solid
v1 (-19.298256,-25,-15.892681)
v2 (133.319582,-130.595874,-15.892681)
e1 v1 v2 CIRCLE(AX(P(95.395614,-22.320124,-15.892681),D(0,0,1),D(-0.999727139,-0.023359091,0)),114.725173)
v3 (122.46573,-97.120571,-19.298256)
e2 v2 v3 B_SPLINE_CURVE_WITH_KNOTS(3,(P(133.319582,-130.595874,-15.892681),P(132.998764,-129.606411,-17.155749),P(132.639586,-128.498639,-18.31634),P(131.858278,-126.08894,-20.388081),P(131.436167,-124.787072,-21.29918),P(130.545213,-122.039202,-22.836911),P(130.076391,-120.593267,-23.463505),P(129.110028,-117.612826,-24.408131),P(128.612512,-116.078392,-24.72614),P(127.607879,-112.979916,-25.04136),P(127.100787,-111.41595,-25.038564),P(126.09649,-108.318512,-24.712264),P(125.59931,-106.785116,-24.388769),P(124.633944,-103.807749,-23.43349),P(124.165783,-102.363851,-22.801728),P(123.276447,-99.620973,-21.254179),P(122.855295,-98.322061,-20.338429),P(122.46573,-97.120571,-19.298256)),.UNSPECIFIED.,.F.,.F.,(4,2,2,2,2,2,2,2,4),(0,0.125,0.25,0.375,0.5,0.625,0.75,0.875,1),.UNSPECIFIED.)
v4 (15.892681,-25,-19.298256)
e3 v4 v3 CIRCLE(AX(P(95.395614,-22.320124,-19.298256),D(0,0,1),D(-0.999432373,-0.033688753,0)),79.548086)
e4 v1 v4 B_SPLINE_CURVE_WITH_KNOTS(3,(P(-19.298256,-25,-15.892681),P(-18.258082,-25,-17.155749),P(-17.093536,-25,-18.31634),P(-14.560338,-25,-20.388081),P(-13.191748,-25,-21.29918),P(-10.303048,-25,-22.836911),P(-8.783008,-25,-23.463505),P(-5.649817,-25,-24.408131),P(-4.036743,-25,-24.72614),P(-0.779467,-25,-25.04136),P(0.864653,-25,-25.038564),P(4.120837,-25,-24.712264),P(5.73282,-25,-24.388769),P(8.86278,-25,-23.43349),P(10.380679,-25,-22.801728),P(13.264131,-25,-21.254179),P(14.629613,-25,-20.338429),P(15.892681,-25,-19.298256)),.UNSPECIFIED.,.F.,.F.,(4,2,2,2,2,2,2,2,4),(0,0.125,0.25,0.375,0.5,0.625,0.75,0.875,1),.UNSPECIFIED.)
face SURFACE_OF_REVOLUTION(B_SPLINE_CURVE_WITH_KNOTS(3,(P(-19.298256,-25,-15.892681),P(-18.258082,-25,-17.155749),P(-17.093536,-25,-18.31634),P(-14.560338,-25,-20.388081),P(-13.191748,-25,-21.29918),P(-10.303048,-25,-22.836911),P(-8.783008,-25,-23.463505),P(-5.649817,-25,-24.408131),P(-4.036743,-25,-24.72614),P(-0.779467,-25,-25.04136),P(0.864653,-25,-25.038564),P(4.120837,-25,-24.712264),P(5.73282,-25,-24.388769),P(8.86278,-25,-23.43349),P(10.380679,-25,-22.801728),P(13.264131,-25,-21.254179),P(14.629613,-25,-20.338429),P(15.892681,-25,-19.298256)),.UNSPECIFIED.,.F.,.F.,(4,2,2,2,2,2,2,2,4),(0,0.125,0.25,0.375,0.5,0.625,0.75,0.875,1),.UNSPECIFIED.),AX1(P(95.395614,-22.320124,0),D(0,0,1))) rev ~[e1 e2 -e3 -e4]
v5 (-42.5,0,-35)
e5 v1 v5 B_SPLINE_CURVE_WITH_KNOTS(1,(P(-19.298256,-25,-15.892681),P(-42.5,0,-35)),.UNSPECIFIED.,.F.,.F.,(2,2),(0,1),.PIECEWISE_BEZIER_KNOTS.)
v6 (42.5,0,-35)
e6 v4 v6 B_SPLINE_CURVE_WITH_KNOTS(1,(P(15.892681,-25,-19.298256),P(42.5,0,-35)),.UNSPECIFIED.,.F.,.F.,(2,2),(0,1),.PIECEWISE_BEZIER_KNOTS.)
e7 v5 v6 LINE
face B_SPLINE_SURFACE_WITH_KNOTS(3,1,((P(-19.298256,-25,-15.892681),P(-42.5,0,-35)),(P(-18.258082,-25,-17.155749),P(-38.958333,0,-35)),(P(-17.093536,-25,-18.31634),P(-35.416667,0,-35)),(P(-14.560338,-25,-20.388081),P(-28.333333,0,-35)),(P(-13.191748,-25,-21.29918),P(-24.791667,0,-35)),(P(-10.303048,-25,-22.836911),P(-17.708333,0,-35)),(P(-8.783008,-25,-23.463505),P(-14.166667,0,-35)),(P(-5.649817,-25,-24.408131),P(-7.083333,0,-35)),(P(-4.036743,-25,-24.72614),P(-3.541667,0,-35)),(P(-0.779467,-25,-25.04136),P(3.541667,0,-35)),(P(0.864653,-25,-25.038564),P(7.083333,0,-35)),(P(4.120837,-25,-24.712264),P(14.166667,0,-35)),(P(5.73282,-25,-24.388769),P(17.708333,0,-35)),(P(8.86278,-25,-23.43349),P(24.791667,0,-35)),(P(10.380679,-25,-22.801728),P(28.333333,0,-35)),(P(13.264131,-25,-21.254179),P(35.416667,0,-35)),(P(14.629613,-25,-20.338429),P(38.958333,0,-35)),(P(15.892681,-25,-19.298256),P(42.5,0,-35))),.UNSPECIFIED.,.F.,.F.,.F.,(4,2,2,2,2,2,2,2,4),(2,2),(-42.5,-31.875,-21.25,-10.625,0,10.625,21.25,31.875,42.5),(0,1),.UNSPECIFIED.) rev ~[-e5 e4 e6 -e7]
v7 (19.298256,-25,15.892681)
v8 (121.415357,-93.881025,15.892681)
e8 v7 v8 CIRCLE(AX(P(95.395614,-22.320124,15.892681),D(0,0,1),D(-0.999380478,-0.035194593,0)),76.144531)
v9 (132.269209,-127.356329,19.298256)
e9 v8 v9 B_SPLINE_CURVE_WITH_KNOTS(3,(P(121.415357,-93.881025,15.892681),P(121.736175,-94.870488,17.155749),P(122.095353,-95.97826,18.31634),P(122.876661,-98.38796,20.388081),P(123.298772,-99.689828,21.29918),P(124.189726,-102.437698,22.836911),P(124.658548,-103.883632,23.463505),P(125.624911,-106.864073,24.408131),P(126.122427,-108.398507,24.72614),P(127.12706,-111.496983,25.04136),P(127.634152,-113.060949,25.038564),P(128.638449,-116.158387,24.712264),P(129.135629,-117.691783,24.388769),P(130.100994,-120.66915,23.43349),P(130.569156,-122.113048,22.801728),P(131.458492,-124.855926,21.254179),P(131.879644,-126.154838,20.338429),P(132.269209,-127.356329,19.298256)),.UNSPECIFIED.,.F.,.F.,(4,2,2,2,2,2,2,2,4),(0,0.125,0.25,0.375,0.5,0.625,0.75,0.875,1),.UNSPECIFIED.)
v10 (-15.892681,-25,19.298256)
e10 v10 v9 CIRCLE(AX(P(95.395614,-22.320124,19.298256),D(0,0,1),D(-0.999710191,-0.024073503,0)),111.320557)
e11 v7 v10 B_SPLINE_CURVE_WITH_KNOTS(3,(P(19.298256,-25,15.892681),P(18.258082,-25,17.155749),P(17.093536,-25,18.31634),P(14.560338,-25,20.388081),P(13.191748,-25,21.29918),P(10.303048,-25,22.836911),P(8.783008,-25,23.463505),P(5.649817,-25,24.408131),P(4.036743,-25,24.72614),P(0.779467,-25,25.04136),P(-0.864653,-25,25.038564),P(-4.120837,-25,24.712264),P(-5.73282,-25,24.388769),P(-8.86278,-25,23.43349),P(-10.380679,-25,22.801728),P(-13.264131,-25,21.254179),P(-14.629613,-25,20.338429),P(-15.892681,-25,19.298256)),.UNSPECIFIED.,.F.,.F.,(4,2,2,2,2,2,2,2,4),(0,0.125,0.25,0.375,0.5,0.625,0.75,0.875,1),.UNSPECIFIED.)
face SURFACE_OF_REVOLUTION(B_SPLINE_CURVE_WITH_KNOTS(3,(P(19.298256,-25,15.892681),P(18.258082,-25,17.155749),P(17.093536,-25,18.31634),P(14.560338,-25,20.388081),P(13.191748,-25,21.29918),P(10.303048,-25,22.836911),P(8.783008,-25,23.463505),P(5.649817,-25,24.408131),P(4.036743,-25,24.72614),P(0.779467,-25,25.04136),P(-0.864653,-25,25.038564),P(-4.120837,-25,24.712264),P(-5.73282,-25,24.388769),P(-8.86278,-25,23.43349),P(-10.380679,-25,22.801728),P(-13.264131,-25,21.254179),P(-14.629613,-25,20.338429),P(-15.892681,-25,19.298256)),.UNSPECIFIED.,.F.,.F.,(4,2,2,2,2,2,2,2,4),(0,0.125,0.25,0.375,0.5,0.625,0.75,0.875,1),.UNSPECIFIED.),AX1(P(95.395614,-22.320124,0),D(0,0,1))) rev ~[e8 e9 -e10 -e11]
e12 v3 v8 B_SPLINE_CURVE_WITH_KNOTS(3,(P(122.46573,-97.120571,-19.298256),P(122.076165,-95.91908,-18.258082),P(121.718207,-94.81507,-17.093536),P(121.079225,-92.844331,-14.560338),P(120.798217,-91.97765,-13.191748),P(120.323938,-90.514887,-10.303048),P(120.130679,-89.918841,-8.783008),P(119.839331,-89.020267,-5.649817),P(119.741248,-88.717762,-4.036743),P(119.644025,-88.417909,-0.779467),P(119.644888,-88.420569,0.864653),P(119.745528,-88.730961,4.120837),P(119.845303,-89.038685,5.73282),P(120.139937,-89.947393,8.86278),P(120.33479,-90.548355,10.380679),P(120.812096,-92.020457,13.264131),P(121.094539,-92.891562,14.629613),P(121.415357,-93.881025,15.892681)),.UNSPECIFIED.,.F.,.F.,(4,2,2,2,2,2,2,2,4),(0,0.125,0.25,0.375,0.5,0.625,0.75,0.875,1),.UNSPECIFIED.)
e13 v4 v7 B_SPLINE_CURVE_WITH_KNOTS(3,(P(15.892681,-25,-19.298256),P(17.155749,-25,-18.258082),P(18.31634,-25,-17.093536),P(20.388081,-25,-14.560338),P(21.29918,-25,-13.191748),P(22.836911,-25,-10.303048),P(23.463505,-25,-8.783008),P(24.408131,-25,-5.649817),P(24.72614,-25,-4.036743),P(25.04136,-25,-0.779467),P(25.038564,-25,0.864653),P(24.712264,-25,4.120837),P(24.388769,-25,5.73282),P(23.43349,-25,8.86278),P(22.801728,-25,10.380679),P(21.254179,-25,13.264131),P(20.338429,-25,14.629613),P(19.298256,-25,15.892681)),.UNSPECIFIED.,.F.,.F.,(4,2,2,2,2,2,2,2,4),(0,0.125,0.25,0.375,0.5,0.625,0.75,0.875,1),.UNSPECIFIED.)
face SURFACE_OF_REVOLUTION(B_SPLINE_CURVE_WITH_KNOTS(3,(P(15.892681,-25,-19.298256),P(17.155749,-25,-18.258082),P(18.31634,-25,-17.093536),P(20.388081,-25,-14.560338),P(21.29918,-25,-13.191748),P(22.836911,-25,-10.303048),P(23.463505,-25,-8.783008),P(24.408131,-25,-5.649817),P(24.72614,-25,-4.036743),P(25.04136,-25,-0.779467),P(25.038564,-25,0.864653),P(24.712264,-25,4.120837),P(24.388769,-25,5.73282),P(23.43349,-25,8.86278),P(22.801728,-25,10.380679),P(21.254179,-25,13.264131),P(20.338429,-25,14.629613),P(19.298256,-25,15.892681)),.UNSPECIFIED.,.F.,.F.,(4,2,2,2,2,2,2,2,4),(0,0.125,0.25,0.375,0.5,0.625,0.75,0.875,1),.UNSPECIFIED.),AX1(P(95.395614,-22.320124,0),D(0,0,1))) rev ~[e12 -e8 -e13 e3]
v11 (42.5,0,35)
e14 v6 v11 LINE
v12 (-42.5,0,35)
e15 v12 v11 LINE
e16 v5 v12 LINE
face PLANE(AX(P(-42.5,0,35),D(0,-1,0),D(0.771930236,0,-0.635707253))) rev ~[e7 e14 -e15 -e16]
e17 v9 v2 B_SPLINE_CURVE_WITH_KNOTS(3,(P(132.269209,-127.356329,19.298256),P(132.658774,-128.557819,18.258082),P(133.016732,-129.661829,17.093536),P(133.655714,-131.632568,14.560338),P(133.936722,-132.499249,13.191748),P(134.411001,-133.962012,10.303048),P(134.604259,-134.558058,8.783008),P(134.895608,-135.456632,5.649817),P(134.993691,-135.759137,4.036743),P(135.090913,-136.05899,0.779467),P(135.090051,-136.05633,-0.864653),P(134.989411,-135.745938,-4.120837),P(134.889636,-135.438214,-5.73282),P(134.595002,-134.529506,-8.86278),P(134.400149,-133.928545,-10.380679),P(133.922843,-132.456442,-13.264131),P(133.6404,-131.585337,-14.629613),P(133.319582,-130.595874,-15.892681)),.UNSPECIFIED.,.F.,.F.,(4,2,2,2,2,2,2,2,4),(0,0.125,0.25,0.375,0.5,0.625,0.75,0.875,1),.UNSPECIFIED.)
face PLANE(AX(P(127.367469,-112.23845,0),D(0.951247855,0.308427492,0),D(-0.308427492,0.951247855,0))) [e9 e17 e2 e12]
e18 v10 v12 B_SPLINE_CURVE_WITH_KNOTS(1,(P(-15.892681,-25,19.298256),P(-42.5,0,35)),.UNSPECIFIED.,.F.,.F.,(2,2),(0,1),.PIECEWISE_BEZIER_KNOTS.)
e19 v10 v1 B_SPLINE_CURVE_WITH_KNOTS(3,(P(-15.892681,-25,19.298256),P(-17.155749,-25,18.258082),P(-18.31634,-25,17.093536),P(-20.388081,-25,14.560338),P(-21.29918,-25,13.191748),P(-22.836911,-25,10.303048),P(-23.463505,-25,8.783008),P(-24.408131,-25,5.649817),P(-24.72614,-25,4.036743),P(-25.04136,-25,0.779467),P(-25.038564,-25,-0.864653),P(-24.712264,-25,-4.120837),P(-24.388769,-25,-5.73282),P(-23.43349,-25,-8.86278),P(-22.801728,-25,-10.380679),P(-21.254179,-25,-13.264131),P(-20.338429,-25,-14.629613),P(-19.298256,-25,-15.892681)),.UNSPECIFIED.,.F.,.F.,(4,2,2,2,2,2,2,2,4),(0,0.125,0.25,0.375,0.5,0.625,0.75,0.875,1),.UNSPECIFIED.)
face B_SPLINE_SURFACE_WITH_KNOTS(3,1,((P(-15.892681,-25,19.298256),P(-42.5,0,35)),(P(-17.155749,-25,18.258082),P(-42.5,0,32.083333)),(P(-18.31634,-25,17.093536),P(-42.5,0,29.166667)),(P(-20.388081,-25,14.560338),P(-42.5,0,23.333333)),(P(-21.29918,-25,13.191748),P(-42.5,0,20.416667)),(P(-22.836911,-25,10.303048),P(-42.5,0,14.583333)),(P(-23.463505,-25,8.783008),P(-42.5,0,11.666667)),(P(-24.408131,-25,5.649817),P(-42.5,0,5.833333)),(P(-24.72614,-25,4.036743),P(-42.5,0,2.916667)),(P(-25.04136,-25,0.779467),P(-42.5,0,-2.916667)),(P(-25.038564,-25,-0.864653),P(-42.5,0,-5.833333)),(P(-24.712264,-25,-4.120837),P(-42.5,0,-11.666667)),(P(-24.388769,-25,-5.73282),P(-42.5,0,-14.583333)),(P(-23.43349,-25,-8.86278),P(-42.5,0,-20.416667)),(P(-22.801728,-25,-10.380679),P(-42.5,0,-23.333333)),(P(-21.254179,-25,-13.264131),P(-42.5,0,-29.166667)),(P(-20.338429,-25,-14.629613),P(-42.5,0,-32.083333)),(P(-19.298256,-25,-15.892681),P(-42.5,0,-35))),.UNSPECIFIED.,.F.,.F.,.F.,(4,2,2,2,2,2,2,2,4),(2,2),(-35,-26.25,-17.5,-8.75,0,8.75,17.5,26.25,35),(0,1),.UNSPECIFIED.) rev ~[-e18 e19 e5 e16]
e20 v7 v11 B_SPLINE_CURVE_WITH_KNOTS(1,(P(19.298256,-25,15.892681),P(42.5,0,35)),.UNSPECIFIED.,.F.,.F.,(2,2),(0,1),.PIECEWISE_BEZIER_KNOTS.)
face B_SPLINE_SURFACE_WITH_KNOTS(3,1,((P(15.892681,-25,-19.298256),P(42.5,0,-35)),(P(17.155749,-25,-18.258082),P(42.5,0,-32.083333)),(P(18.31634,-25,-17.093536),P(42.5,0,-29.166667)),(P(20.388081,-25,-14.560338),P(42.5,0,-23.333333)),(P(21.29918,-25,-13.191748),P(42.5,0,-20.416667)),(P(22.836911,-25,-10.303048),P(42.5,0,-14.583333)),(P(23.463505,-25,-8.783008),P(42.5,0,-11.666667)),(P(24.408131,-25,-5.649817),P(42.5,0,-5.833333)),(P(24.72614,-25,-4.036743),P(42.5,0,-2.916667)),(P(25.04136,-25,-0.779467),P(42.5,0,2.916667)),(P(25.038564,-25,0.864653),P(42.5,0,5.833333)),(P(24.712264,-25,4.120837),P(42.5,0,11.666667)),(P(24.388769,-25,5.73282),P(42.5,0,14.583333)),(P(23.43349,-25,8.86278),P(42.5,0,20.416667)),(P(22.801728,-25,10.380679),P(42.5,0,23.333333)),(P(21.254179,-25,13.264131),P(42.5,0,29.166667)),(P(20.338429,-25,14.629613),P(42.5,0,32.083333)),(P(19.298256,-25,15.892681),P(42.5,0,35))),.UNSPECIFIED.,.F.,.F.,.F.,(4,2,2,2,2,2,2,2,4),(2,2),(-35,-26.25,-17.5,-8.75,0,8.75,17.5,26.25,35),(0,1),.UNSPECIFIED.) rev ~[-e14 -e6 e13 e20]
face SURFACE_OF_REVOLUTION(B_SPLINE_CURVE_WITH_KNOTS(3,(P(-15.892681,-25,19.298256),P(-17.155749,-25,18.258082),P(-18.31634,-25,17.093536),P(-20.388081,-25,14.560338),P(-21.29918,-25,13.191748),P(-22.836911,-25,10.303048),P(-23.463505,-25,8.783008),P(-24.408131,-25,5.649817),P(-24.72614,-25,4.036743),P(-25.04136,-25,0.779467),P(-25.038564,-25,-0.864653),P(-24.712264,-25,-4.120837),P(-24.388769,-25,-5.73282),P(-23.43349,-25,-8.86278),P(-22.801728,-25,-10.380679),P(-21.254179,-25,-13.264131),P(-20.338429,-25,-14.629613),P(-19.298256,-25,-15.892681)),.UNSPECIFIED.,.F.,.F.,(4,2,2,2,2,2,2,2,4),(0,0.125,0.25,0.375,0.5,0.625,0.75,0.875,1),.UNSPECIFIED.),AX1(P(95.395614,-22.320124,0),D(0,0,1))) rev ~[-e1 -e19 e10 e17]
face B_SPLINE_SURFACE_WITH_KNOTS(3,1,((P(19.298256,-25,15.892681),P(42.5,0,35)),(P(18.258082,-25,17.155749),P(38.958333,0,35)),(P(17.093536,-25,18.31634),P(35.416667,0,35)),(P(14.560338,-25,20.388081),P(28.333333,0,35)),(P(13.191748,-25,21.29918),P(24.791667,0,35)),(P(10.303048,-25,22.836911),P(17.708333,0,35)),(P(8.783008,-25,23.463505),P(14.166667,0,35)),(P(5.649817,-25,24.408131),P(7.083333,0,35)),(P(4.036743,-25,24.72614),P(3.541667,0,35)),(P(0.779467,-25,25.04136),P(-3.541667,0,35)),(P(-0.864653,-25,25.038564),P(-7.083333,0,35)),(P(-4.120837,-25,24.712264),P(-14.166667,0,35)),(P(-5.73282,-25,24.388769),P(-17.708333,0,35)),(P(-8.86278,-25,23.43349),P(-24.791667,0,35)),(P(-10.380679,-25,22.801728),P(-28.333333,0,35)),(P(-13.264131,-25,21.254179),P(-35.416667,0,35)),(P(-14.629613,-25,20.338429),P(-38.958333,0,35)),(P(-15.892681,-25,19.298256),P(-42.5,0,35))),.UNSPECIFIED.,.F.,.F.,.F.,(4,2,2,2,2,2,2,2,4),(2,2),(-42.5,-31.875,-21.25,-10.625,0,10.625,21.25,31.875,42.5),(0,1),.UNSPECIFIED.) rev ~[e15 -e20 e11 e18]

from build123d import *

# Parameters (mm, degrees)
F2_W = 85
F2_H = 70


# Not quite as in the source:
# - the arcs of a loft's sections are written as splines that run evenly, so that the points pair up as in the source's solid


with BuildPart() as f3:
    # F1 (on offset) → F3 section 0
    with BuildSketch(Plane.XZ.offset(25)):
        with BuildLine():
            add(Edge.make_bspline(
                [(19.2982558904, 15.8926813215), (18.2580823303, 17.155749216), (17.0935362371, 18.3163402581), (14.560337759, 20.3880814665), (13.1917480123, 21.2991804049), (10.3030475731, 22.8369111801), (8.7830083094, 23.4635049935), (5.649817047, 24.4081312041), (4.0367425227, 24.7261402436), (0.7794672203, 25.0413604342), (-0.8646530153, 25.0385637908), (-4.1208370946, 24.7122642261), (-5.7328204228, 24.3887693732), (-8.8627799509, 23.4334895626), (-10.3806787565, 22.8017282261), (-13.2641311441, 21.2541790369), (-14.6296134271, 20.3384294505), (-15.8926813215, 19.2982558904)],
                knots=[0, 0, 0, 0, 0.125, 0.125, 0.25, 0.25, 0.375, 0.375, 0.5, 0.5, 0.625, 0.625, 0.75, 0.75, 0.875, 0.875, 1, 1, 1, 1], degree=3))
            add(Edge.make_bspline(
                [(-15.8926813215, 19.2982558904), (-17.155749216, 18.2580823303), (-18.3163402581, 17.0935362371), (-20.3880814665, 14.560337759), (-21.2991804049, 13.1917480123), (-22.8369111801, 10.3030475731), (-23.4635049935, 8.7830083094), (-24.4081312041, 5.649817047), (-24.7261402436, 4.0367425227), (-25.0413604342, 0.7794672203), (-25.0385637908, -0.8646530153), (-24.7122642261, -4.1208370946), (-24.3887693732, -5.7328204228), (-23.4334895626, -8.8627799509), (-22.8017282261, -10.3806787565), (-21.2541790369, -13.2641311441), (-20.3384294505, -14.6296134271), (-19.2982558904, -15.8926813215)],
                knots=[0, 0, 0, 0, 0.125, 0.125, 0.25, 0.25, 0.375, 0.375, 0.5, 0.5, 0.625, 0.625, 0.75, 0.75, 0.875, 0.875, 1, 1, 1, 1], degree=3))
            add(Edge.make_bspline(
                [(-19.2982558904, -15.8926813215), (-18.2580823303, -17.155749216), (-17.0935362371, -18.3163402581), (-14.560337759, -20.3880814665), (-13.1917480123, -21.2991804049), (-10.3030475731, -22.8369111801), (-8.7830083094, -23.4635049935), (-5.649817047, -24.4081312041), (-4.0367425227, -24.7261402436), (-0.7794672203, -25.0413604342), (0.8646530153, -25.0385637908), (4.1208370946, -24.7122642261), (5.7328204228, -24.3887693732), (8.8627799509, -23.4334895626), (10.3806787565, -22.8017282261), (13.2641311441, -21.2541790369), (14.6296134271, -20.3384294505), (15.8926813215, -19.2982558904)],
                knots=[0, 0, 0, 0, 0.125, 0.125, 0.25, 0.25, 0.375, 0.375, 0.5, 0.5, 0.625, 0.625, 0.75, 0.75, 0.875, 0.875, 1, 1, 1, 1], degree=3))
            add(Edge.make_bspline(
                [(15.8926813215, -19.2982558904), (17.155749216, -18.2580823303), (18.3163402581, -17.0935362371), (20.3880814665, -14.560337759), (21.2991804049, -13.1917480123), (22.8369111801, -10.3030475731), (23.4635049935, -8.7830083094), (24.4081312041, -5.649817047), (24.7261402436, -4.0367425227), (25.0413604342, -0.7794672203), (25.0385637908, 0.8646530153), (24.7122642261, 4.1208370946), (24.3887693732, 5.7328204228), (23.4334895626, 8.8627799509), (22.8017282261, 10.3806787565), (21.2541790369, 13.2641311441), (20.3384294505, 14.6296134271), (19.2982558904, 15.8926813215)],
                knots=[0, 0, 0, 0, 0.125, 0.125, 0.25, 0.25, 0.375, 0.375, 0.5, 0.5, 0.625, 0.625, 0.75, 0.75, 0.875, 0.875, 1, 1, 1, 1], degree=3))
        make_face()
    # F2 (on Front) → F3 section 1
    with BuildSketch(Plane.XZ):
        Rectangle(F2_W, F2_H)
    loft(ruled=True)

    # F5: sweep along a path in F4
    with BuildLine(Plane.XY) as f5_path:
        ThreePointArc((0, -25), (41.4671421212, -101.0552801806), (127.3674694821, -112.2384496033))
    # F3_face (on face) → F5 (sweep)
    with BuildSketch(Plane.XZ.offset(25)):
        with BuildLine():
            add(Edge.make_bspline(
                [(19.2982558904, 15.8926813215), (18.2580823303, 17.155749216), (17.0935362371, 18.3163402581), (14.560337759, 20.3880814665), (13.1917480123, 21.2991804049), (10.3030475731, 22.8369111801), (8.7830083094, 23.4635049935), (5.649817047, 24.4081312041), (4.0367425227, 24.7261402436), (0.7794672203, 25.0413604342), (-0.8646530153, 25.0385637908), (-4.1208370946, 24.7122642261), (-5.7328204228, 24.3887693732), (-8.8627799509, 23.4334895626), (-10.3806787565, 22.8017282261), (-13.2641311441, 21.2541790369), (-14.6296134271, 20.3384294505), (-15.8926813215, 19.2982558904)],
                knots=[0, 0, 0, 0, 0.125, 0.125, 0.25, 0.25, 0.375, 0.375, 0.5, 0.5, 0.625, 0.625, 0.75, 0.75, 0.875, 0.875, 1, 1, 1, 1], degree=3))
            add(Edge.make_bspline(
                [(-15.8926813215, 19.2982558904), (-17.155749216, 18.2580823303), (-18.3163402581, 17.0935362371), (-20.3880814665, 14.560337759), (-21.2991804049, 13.1917480123), (-22.8369111801, 10.3030475731), (-23.4635049935, 8.7830083094), (-24.4081312041, 5.649817047), (-24.7261402436, 4.0367425227), (-25.0413604342, 0.7794672203), (-25.0385637908, -0.8646530153), (-24.7122642261, -4.1208370946), (-24.3887693732, -5.7328204228), (-23.4334895626, -8.8627799509), (-22.8017282261, -10.3806787565), (-21.2541790369, -13.2641311441), (-20.3384294505, -14.6296134271), (-19.2982558904, -15.8926813215)],
                knots=[0, 0, 0, 0, 0.125, 0.125, 0.25, 0.25, 0.375, 0.375, 0.5, 0.5, 0.625, 0.625, 0.75, 0.75, 0.875, 0.875, 1, 1, 1, 1], degree=3))
            add(Edge.make_bspline(
                [(-19.2982558904, -15.8926813215), (-18.2580823303, -17.155749216), (-17.0935362371, -18.3163402581), (-14.560337759, -20.3880814665), (-13.1917480123, -21.2991804049), (-10.3030475731, -22.8369111801), (-8.7830083094, -23.4635049935), (-5.649817047, -24.4081312041), (-4.0367425227, -24.7261402436), (-0.7794672203, -25.0413604342), (0.8646530153, -25.0385637908), (4.1208370946, -24.7122642261), (5.7328204228, -24.3887693732), (8.8627799509, -23.4334895626), (10.3806787565, -22.8017282261), (13.2641311441, -21.2541790369), (14.6296134271, -20.3384294505), (15.8926813215, -19.2982558904)],
                knots=[0, 0, 0, 0, 0.125, 0.125, 0.25, 0.25, 0.375, 0.375, 0.5, 0.5, 0.625, 0.625, 0.75, 0.75, 0.875, 0.875, 1, 1, 1, 1], degree=3))
            add(Edge.make_bspline(
                [(15.8926813215, -19.2982558904), (17.155749216, -18.2580823303), (18.3163402581, -17.0935362371), (20.3880814665, -14.560337759), (21.2991804049, -13.1917480123), (22.8369111801, -10.3030475731), (23.4635049935, -8.7830083094), (24.4081312041, -5.649817047), (24.7261402436, -4.0367425227), (25.0413604342, -0.7794672203), (25.0385637908, 0.8646530153), (24.7122642261, 4.1208370946), (24.3887693732, 5.7328204228), (23.4334895626, 8.8627799509), (22.8017282261, 10.3806787565), (21.2541790369, 13.2641311441), (20.3384294505, 14.6296134271), (19.2982558904, 15.8926813215)],
                knots=[0, 0, 0, 0, 0.125, 0.125, 0.25, 0.25, 0.375, 0.375, 0.5, 0.5, 0.625, 0.625, 0.75, 0.75, 0.875, 0.875, 1, 1, 1, 1], degree=3))
        make_face()
    sweep(path=f5_path.line)


solid = f3.part
